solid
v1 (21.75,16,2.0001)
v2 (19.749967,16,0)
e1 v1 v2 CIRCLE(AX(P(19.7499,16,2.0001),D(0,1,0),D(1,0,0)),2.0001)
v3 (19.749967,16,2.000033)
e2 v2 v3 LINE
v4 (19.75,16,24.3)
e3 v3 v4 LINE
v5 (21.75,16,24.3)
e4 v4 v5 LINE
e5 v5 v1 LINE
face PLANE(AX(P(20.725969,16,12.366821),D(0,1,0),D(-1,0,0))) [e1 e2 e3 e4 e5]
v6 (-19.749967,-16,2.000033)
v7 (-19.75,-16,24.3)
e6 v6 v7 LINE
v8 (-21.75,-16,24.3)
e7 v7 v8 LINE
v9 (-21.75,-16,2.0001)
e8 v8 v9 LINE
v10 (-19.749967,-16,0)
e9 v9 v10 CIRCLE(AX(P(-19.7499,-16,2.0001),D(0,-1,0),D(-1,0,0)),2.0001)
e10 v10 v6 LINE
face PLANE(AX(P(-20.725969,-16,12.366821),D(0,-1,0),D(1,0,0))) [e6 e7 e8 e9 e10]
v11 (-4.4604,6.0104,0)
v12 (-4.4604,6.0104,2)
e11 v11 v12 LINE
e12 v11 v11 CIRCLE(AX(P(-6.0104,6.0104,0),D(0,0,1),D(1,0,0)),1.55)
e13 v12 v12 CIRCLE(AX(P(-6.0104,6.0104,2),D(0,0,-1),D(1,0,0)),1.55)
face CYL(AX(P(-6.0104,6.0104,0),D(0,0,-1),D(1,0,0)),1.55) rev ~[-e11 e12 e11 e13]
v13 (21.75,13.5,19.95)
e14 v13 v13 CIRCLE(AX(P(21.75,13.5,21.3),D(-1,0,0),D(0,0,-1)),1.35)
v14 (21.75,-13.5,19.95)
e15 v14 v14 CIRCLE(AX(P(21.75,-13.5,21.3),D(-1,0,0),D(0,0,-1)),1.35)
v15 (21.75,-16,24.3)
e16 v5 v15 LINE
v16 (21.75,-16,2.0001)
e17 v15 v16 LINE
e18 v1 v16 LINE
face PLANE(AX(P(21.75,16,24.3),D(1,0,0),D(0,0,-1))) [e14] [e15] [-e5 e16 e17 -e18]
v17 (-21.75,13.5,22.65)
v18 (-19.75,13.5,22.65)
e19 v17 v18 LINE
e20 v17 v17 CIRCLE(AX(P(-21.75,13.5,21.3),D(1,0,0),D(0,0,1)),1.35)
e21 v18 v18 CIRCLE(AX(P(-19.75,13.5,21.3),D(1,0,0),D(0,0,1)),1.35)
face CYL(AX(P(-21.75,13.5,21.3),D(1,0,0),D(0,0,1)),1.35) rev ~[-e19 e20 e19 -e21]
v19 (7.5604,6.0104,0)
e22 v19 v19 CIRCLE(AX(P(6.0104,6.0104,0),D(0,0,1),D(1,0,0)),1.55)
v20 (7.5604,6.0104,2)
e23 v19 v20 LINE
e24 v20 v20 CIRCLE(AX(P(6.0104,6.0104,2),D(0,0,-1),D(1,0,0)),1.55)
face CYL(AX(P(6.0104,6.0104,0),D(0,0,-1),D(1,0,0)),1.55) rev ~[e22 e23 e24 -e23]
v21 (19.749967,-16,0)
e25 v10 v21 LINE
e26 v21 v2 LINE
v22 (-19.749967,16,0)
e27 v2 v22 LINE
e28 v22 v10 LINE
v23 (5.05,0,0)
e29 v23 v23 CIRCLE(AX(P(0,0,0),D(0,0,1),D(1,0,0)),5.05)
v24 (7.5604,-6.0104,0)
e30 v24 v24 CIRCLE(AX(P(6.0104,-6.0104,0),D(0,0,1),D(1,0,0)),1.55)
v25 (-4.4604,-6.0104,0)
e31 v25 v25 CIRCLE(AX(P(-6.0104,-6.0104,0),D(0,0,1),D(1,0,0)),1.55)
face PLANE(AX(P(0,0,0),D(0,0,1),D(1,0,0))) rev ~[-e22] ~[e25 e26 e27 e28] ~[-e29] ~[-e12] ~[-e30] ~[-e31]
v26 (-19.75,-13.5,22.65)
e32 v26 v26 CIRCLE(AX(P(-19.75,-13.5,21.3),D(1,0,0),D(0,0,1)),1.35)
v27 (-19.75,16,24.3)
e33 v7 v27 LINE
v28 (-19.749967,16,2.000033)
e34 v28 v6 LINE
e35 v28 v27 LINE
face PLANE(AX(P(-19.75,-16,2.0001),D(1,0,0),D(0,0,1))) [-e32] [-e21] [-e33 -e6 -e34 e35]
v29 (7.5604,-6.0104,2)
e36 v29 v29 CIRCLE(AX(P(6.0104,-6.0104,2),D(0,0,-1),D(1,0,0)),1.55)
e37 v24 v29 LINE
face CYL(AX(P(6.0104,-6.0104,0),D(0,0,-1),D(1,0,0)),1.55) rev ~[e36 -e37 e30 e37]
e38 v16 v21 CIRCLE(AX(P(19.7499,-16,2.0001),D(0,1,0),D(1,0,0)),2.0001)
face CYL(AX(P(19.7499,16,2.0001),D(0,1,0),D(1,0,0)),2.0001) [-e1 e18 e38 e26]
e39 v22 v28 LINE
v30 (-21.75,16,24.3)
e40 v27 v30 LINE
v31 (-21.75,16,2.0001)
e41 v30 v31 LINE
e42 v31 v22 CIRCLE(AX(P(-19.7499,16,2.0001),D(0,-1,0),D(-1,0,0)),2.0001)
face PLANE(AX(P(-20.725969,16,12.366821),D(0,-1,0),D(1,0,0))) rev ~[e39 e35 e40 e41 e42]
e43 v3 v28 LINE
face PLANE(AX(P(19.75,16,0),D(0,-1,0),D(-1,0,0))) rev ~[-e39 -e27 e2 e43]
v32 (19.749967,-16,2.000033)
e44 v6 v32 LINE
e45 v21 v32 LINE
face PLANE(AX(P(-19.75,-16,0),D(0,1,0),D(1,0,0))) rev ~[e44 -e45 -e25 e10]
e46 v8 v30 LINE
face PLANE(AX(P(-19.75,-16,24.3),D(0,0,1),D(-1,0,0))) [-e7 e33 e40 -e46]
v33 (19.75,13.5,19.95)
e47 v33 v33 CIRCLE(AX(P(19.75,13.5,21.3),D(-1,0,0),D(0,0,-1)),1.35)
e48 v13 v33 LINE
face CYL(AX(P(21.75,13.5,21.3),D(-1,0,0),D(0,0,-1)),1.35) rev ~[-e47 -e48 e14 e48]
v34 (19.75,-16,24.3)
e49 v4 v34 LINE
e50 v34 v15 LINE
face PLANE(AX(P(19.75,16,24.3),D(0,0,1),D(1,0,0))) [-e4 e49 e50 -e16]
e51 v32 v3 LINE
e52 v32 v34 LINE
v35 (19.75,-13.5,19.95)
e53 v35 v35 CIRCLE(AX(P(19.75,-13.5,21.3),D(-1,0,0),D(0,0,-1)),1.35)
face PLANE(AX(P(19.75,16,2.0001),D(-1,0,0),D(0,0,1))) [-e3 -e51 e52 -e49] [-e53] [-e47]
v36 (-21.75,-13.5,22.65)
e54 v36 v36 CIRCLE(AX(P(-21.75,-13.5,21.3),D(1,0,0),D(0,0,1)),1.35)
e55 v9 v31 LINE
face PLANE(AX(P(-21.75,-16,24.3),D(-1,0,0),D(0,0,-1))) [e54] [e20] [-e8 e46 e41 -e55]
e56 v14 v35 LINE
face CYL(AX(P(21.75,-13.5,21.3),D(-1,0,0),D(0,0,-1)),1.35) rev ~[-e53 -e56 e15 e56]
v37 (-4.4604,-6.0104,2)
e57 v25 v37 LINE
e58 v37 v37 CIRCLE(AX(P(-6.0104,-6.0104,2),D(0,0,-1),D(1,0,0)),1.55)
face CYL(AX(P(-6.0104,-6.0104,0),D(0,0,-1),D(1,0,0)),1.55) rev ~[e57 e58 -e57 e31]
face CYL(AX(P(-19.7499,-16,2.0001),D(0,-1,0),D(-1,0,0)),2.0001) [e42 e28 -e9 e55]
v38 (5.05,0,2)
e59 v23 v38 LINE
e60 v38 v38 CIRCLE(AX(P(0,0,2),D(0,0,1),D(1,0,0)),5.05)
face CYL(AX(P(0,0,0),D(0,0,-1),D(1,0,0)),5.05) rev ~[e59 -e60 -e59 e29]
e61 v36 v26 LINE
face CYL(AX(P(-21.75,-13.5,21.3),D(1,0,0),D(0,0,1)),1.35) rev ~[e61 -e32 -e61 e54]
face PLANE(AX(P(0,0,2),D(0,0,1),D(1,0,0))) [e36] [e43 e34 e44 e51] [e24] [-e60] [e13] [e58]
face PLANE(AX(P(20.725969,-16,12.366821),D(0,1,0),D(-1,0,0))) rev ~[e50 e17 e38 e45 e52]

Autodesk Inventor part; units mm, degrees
ref_plane "YZ Plane" through (0, 0, 0) normal (1, 0, 0) x (0, 1, 0)
ref_plane "XZ Plane" through (0, 0, 0) normal (0, 1, 0) x (-1, 0, 0)
ref_plane "XY Plane" through (0, 0, 0) normal (0, 0, 1) x (1, 0, 0)
sketch "スケッチ1" plane through (0, 0, 0) normal (0, 0, 1) x (1, 0, 0)
  line L0 (-19.75, -16) -> (19.75, -16)
  line L1 (19.75, -16) -> (19.75, 16)
  line L2 (19.75, 16) -> (-19.75, 16)
  line L3 (-19.75, 16) -> (-19.75, -16)
  line L4 (-19.75, -16) -> (19.75, 16) construction
  line L5 (19.75, -16) -> (-19.75, 16) construction
  circle A0 centre (0, 0) radius 5.05
  circle A1 centre (-6.0104, 6.0104) radius 1.55
  circle A2 centre (0, 0) radius 8.5 construction
  line L6 (-6.0104, 6.0104) -> (0, 0) construction
  circle A3 centre (-6.0104, -6.0104) radius 1.55
  circle A4 centre (6.0104, -6.0104) radius 1.55
  circle A5 centre (6.0104, 6.0104) radius 1.55
  circle A6 centre (0, 0) radius 8.5
  dimension "d35" = 17
  dimension "d0" = 39.5
  dimension "d1" = 32
  dimension "d2" = 10.1
  dimension "d3" = 3.1
  dimension "d5" = 45
  dimension "d8" = 360
extrude "押し出し1" add sketch "スケッチ1" along normal blind 2 contours L3 L2 L1 L0 | A1 A6 A5 A4 A3
sketch "スケッチ2" plane through (-19.75, -16, 2) normal (-1, 0, 0) x (0, -1, 0)
  line L0 (-32, 0) -> (0, 0)
  line L1 (0, 0) -> (0, 22.3)
  line L2 (0, 22.3) -> (-32, 22.3)
  line L3 (-32, 22.3) -> (-32, 0)
edge flange "フランジ1" height 22.3 angle 90 thickness 2 bend radius 0.0001 thickness toward (-1, 0, 0) relief tear relief width 2 relief depth 1 corner gap 2 corner form 0 edges at (-19.75, 0, 2) (19.75, 0, 2) wall of the first edge with corners at (-19.75, 16, 2) (-19.75, -16, 2) (-19.75, -16, 24.3) (-19.75, 16, 24.3)
bend "曲げ1"
corner "コーナー1"
sketch "スケッチ4" plane through (21.75, -16, 24.3) normal (1, 0, 0) x (0, 0, -1)
  line L0 (0, 0) -> (0, 32) projected
  line L1 (0, 32) -> (0, 0) construction
  line L2 (0, 16) -> (24.3, 16) construction
  point P0 (3, 2.5)
  point P1 (3, 29.5)
  dimension "d25" = 3
  dimension "d26" = 13.5
hole "穴1" at (21.75, -13.5, 21.3) at (21.75, 13.5, 21.3) direction (-1, 0, 0) diameter 2.7 end up to surface
mirror "ミラー1" about plane through (0, 0, 0) normal (1, 0, 0) of "穴1"
equation "\"d32\" = Thickness"
equation "\"d12\" = BendReliefWidth"
equation "\"d13\" = BendReliefDepth"
equation "\"d14\" = MinimumRemnant"
equation "\"d15\" = BendRadius"
equation "\"d19\" = CornerReliefSize"
equation "\"d20\" = GapSize"
equation "\"d21\" = JacobiRadiusSize"
equation "\"d34\" = Thickness"
equation "\"BendRadius\" = Thickness"
equation "\"BendReliefWidth\" = Thickness"
equation "\"BendReliefDepth\" = 0.5 * Thickness"
equation "\"CornerReliefSize\" = 4 * Thickness"
equation "\"MinimumRemnant\" = 2 * Thickness"
equation "\"TransitionRadius\" = BendRadius"
equation "\"JacobiRadiusSize\" = BendRadius"
equation "\"GapSize\" = Thickness"
equation "\"Thickness\" = 2"
properties part number "servo_bracket_1170" material "アルミニウム 5052"
